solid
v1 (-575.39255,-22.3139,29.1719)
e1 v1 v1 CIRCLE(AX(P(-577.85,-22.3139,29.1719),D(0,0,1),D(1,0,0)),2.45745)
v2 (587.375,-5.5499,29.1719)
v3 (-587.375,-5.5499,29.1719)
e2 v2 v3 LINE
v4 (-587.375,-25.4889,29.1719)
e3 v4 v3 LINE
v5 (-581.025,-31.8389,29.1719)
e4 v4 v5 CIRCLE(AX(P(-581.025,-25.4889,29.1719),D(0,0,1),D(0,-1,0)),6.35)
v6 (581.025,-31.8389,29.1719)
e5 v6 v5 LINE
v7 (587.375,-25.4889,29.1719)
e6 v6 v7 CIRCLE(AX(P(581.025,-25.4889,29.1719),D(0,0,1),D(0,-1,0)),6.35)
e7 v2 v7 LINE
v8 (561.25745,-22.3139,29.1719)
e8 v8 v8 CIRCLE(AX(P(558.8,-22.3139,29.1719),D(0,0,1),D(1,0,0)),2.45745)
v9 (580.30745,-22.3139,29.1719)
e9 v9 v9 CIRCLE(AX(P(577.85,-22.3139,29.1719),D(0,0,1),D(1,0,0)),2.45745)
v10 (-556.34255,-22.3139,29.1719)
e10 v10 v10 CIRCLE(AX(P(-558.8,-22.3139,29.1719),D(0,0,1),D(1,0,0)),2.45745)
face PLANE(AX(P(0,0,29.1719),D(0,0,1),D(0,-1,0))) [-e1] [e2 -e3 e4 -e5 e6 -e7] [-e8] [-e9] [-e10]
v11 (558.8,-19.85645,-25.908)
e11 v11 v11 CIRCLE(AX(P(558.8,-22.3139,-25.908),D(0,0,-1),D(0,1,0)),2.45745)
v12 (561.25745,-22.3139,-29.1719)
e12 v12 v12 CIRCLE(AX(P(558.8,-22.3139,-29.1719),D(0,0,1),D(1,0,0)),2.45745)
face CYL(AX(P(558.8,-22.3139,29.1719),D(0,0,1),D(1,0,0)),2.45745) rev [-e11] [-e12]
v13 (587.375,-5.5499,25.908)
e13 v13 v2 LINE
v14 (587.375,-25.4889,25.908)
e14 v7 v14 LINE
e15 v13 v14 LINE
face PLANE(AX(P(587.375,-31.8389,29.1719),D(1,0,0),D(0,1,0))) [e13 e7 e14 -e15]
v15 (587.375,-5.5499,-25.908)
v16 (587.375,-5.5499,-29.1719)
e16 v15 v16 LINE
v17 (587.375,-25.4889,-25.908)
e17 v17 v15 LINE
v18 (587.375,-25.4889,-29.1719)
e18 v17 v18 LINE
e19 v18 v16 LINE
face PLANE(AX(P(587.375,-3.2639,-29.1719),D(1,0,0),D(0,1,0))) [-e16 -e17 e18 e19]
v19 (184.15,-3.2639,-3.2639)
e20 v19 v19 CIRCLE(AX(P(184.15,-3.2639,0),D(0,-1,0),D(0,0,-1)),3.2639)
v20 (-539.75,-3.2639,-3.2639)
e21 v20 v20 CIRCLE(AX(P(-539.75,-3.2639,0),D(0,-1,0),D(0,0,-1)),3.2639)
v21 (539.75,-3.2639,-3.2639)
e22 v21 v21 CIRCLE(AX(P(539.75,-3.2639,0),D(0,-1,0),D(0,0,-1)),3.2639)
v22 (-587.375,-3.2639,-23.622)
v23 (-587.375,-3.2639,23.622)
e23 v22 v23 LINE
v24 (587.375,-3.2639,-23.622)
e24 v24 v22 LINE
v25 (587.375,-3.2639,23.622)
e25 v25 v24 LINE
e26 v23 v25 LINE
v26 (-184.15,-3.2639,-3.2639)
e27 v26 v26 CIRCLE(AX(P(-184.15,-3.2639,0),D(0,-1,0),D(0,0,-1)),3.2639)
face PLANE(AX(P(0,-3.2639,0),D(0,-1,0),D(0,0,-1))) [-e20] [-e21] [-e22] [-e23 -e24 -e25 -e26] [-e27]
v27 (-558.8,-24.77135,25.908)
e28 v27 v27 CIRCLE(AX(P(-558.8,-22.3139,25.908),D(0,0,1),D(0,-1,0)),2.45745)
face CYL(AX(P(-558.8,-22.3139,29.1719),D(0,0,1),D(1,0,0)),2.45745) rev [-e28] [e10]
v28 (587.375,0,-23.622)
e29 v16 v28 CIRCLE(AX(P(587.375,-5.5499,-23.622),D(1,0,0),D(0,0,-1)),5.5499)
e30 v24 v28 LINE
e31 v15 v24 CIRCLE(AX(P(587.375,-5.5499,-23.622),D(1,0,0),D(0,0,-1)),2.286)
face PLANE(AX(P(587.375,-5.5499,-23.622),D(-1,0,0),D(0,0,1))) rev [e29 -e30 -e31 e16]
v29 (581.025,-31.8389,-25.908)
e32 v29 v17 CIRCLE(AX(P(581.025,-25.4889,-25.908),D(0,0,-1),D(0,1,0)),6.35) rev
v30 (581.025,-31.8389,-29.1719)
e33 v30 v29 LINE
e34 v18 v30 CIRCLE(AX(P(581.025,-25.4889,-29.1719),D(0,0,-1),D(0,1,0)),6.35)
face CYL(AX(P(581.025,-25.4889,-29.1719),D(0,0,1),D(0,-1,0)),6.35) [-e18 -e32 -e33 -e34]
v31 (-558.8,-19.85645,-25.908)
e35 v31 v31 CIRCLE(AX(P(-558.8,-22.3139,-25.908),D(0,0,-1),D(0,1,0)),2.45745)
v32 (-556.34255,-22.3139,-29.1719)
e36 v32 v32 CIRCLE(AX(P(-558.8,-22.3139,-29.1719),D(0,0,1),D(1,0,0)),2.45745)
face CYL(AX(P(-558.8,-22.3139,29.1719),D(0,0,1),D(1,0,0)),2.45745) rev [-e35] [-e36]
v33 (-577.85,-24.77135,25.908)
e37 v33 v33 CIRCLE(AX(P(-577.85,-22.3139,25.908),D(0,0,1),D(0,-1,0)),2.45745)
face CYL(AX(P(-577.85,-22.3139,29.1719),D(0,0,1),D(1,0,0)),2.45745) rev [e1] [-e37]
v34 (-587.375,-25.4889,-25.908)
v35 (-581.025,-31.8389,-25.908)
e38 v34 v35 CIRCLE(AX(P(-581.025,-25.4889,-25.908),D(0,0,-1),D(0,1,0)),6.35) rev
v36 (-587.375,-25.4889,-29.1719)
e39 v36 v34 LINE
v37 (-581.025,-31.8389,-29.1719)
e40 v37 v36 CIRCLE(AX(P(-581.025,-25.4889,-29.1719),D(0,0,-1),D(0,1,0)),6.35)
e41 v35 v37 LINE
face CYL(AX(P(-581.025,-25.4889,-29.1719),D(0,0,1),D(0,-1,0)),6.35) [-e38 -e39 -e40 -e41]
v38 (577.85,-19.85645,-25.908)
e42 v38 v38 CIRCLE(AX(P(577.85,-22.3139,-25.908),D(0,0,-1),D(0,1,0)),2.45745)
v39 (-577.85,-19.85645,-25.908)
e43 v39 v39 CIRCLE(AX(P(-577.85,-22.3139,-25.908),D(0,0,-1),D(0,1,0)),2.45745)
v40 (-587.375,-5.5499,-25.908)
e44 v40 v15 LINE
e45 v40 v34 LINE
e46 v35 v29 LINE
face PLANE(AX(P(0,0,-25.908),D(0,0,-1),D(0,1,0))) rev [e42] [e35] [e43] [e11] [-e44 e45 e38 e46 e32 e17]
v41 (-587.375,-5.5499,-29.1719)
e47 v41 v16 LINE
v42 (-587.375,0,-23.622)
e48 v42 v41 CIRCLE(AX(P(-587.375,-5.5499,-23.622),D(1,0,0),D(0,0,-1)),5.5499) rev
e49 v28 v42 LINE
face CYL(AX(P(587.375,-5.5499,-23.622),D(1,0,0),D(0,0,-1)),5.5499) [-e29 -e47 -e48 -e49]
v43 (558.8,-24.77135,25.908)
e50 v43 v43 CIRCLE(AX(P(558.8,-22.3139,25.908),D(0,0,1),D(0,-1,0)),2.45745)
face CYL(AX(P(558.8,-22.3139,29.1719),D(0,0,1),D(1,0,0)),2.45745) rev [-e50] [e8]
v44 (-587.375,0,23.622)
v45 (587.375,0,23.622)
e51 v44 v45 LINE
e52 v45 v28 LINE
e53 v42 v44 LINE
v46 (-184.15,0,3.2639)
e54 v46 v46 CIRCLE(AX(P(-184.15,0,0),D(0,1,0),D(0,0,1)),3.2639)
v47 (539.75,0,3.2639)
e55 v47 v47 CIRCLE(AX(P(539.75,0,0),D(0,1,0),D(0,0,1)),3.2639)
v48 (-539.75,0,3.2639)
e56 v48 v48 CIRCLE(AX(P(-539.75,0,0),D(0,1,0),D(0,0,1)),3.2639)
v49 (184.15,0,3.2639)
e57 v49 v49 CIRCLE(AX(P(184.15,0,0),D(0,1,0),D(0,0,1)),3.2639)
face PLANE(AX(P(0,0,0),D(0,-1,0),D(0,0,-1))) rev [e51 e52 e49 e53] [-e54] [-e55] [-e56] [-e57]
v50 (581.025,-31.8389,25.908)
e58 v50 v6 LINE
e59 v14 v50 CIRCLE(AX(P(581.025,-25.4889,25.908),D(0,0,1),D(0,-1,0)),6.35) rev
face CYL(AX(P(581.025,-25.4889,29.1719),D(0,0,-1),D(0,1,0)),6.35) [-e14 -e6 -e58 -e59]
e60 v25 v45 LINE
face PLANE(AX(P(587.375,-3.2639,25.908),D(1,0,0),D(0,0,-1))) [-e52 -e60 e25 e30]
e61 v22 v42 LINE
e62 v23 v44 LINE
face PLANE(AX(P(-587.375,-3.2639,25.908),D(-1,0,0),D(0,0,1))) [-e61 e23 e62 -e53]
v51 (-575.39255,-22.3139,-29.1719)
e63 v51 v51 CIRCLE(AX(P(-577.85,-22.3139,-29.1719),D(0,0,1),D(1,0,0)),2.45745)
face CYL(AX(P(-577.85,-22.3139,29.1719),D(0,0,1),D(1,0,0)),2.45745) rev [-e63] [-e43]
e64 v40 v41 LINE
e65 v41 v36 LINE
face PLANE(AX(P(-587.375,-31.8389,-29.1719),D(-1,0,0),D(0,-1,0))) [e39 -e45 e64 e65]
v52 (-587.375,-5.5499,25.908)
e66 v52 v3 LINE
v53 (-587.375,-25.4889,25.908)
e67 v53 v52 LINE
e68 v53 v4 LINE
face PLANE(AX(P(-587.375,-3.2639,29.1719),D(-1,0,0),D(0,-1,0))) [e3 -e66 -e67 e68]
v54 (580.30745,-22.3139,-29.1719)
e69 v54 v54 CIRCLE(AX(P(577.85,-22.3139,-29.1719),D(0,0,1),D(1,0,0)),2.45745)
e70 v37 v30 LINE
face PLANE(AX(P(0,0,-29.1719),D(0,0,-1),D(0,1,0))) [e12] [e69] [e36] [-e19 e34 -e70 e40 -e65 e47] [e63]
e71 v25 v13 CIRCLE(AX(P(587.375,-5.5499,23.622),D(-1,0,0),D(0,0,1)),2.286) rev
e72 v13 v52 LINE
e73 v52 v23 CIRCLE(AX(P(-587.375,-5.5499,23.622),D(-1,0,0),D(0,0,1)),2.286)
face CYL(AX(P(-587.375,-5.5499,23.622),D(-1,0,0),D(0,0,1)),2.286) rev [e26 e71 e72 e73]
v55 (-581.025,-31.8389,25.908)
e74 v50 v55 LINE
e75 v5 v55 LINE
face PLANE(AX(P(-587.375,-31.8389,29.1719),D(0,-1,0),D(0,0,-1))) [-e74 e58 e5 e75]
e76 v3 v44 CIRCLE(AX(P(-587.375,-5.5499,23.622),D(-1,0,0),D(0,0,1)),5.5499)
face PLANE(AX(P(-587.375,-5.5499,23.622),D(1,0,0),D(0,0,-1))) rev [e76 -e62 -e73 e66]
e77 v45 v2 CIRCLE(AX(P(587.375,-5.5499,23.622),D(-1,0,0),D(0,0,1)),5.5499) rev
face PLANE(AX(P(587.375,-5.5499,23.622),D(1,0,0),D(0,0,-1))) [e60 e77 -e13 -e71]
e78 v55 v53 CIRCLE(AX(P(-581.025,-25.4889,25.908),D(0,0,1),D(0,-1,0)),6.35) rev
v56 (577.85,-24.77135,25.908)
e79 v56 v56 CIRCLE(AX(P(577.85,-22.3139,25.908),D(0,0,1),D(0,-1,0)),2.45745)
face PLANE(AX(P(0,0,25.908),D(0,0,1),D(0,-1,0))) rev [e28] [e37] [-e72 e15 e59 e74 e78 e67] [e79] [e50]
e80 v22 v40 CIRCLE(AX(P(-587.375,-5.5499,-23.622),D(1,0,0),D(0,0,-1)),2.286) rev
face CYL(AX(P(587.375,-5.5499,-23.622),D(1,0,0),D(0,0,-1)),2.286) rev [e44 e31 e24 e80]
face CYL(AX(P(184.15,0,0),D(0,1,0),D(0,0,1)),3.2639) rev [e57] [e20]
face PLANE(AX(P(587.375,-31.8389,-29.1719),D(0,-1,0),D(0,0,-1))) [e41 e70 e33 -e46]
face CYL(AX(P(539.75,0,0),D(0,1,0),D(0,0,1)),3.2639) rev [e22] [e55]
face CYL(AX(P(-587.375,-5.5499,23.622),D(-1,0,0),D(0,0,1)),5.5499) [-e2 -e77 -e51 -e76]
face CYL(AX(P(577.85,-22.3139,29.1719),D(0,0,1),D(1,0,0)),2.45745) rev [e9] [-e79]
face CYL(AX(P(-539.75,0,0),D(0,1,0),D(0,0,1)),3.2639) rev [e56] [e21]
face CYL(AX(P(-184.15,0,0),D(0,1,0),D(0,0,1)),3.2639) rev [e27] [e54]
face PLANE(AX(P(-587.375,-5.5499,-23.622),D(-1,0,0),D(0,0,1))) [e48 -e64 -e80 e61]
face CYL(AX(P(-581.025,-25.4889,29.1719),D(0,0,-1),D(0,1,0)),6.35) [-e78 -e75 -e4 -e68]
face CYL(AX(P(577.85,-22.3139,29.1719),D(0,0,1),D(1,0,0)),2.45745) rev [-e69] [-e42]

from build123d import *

# Parameters (mm, degrees)
SKETCH1_W                      = 1174.75
SKETCH1_H                      = 51.816
BASE_FLANGE1_DEPTH             = 3.2639
EDGE_FLANGE1_STRIP_W           = 17.6276
EDGE_FLANGE1_STRIP_H           = 3.2639
EDGE_FLANGE1_STRIP_CUT_DEPTH   = 1174.75
EDGE_FLANGE1_STRIP_2_W         = 17.6276
EDGE_FLANGE1_STRIP_2_H         = 3.2639
EDGE_FLANGE1_STRIP_CUT_2_DEPTH = 1174.75
EDGE_FLANGE1_DEPTH             = 1174.75
EDGE_FLANGE1_BEND_DEPTH        = 1174.75
F_10_0_1935_DIAMETER_HOLE2_D   = 4.9149
FILLET2_R                      = 6.35
F_1_4_CLEARANCE_HOLE1_D        = 6.5278


# Sheet-metal steps are written as plain solids
with BuildPart() as part:
    # Sketch1 → Base-Flange1 (new body)
    with BuildSketch(Plane(origin=(0, 0, 0), x_dir=(1, 0, 0), z_dir=(0, 1, 0))):
        Rectangle(SKETCH1_W, SKETCH1_H)
    extrude(amount=-BASE_FLANGE1_DEPTH)

    # Edge-Flange1 strip (across the edge) → Edge-Flange1 strip cut (cut)
    with BuildSketch(Plane(origin=(587.375, -3.2639, 25.908), x_dir=(0, 0, -1), z_dir=(-1, 0, 0))):
        with Locations((-6.5278, -1.63195)):
            Rectangle(EDGE_FLANGE1_STRIP_W, EDGE_FLANGE1_STRIP_H)
    extrude(amount=EDGE_FLANGE1_STRIP_CUT_DEPTH, mode=Mode.SUBTRACT)

    # Edge-Flange1 strip 2 (across the edge) → Edge-Flange1 strip cut 2 (cut)
    with BuildSketch(Plane(origin=(-587.375, -3.2639, -25.908), x_dir=(0, 0, 1), z_dir=(1, 0, 0))):
        with Locations((-6.5278, -1.63195)):
            Rectangle(EDGE_FLANGE1_STRIP_2_W, EDGE_FLANGE1_STRIP_2_H)
    extrude(amount=EDGE_FLANGE1_STRIP_CUT_2_DEPTH, mode=Mode.SUBTRACT)

    # Edge-Flange1 section (across the edge) → Edge-Flange1 (add)
    with BuildSketch(Plane(origin=(587.375, -3.2639, 25.908), x_dir=(0, 0, -1), z_dir=(-1, 0, 0))):
        with BuildLine():
            Line((-3.2639, 2.286), (-3.2639, 28.575))
            Line((-3.2639, 28.575), (0, 28.575))
            Line((0, 28.575), (0, 2.286))
            ThreePointArc((0, 2.286), (0.669553898, 0.669553898), (2.286, 0))
            Line((2.286, 0), (2.286, -3.2639))
            ThreePointArc((2.286, -3.2639), (-1.638371925, -1.638371925), (-3.2639, 2.286))
        make_face()
    extrude(amount=EDGE_FLANGE1_DEPTH)

    # Edge-Flange1 section 2 (across the edge) → Edge-Flange1 bend (add)
    with BuildSketch(Plane(origin=(-587.375, -3.2639, -25.908), x_dir=(0, 0, 1), z_dir=(1, 0, 0))):
        with BuildLine():
            Line((-3.2639, 2.286), (-3.2639, 28.575))
            Line((-3.2639, 28.575), (0, 28.575))
            Line((0, 28.575), (0, 2.286))
            ThreePointArc((0, 2.286), (0.669553898, 0.669553898), (2.286, 0))
            Line((2.286, 0), (2.286, -3.2639))
            ThreePointArc((2.286, -3.2639), (-1.638371925, -1.638371925), (-3.2639, 2.286))
        make_face()
    extrude(amount=EDGE_FLANGE1_BEND_DEPTH)

    # #10 (0.1935) Diameter Hole2 (through all)
    with Locations(Plane.XY.offset(29.1719)):
        with Locations((577.85, -22.3139), (558.8, -22.3139), (-558.8, -22.3139), (-577.85, -22.3139)):
            Hole(F_10_0_1935_DIAMETER_HOLE2_D / 2)

    # Fillet2
    fillet2_edges = [part.edges().sort_by_distance(p)[0] for p in [
        (587.375, -31.8389, 27.53995),
        (-587.375, -31.8389, 27.53995),
        (-587.375, -31.8389, -27.53995),
        (587.375, -31.8389, -27.53995),
    ]]
    fillet(fillet2_edges, radius=FILLET2_R)

    # 1/4 Clearance Hole1 (through all)
    with Locations(Plane(origin=(0, 0, 0), x_dir=(1, 0, 0), z_dir=(0, 1, 0))):
        with Locations((539.75, 0), (184.15, 0), (-184.15, 0), (-539.75, 0)):
            Hole(F_1_4_CLEARANCE_HOLE1_D / 2)


solid = part.part
